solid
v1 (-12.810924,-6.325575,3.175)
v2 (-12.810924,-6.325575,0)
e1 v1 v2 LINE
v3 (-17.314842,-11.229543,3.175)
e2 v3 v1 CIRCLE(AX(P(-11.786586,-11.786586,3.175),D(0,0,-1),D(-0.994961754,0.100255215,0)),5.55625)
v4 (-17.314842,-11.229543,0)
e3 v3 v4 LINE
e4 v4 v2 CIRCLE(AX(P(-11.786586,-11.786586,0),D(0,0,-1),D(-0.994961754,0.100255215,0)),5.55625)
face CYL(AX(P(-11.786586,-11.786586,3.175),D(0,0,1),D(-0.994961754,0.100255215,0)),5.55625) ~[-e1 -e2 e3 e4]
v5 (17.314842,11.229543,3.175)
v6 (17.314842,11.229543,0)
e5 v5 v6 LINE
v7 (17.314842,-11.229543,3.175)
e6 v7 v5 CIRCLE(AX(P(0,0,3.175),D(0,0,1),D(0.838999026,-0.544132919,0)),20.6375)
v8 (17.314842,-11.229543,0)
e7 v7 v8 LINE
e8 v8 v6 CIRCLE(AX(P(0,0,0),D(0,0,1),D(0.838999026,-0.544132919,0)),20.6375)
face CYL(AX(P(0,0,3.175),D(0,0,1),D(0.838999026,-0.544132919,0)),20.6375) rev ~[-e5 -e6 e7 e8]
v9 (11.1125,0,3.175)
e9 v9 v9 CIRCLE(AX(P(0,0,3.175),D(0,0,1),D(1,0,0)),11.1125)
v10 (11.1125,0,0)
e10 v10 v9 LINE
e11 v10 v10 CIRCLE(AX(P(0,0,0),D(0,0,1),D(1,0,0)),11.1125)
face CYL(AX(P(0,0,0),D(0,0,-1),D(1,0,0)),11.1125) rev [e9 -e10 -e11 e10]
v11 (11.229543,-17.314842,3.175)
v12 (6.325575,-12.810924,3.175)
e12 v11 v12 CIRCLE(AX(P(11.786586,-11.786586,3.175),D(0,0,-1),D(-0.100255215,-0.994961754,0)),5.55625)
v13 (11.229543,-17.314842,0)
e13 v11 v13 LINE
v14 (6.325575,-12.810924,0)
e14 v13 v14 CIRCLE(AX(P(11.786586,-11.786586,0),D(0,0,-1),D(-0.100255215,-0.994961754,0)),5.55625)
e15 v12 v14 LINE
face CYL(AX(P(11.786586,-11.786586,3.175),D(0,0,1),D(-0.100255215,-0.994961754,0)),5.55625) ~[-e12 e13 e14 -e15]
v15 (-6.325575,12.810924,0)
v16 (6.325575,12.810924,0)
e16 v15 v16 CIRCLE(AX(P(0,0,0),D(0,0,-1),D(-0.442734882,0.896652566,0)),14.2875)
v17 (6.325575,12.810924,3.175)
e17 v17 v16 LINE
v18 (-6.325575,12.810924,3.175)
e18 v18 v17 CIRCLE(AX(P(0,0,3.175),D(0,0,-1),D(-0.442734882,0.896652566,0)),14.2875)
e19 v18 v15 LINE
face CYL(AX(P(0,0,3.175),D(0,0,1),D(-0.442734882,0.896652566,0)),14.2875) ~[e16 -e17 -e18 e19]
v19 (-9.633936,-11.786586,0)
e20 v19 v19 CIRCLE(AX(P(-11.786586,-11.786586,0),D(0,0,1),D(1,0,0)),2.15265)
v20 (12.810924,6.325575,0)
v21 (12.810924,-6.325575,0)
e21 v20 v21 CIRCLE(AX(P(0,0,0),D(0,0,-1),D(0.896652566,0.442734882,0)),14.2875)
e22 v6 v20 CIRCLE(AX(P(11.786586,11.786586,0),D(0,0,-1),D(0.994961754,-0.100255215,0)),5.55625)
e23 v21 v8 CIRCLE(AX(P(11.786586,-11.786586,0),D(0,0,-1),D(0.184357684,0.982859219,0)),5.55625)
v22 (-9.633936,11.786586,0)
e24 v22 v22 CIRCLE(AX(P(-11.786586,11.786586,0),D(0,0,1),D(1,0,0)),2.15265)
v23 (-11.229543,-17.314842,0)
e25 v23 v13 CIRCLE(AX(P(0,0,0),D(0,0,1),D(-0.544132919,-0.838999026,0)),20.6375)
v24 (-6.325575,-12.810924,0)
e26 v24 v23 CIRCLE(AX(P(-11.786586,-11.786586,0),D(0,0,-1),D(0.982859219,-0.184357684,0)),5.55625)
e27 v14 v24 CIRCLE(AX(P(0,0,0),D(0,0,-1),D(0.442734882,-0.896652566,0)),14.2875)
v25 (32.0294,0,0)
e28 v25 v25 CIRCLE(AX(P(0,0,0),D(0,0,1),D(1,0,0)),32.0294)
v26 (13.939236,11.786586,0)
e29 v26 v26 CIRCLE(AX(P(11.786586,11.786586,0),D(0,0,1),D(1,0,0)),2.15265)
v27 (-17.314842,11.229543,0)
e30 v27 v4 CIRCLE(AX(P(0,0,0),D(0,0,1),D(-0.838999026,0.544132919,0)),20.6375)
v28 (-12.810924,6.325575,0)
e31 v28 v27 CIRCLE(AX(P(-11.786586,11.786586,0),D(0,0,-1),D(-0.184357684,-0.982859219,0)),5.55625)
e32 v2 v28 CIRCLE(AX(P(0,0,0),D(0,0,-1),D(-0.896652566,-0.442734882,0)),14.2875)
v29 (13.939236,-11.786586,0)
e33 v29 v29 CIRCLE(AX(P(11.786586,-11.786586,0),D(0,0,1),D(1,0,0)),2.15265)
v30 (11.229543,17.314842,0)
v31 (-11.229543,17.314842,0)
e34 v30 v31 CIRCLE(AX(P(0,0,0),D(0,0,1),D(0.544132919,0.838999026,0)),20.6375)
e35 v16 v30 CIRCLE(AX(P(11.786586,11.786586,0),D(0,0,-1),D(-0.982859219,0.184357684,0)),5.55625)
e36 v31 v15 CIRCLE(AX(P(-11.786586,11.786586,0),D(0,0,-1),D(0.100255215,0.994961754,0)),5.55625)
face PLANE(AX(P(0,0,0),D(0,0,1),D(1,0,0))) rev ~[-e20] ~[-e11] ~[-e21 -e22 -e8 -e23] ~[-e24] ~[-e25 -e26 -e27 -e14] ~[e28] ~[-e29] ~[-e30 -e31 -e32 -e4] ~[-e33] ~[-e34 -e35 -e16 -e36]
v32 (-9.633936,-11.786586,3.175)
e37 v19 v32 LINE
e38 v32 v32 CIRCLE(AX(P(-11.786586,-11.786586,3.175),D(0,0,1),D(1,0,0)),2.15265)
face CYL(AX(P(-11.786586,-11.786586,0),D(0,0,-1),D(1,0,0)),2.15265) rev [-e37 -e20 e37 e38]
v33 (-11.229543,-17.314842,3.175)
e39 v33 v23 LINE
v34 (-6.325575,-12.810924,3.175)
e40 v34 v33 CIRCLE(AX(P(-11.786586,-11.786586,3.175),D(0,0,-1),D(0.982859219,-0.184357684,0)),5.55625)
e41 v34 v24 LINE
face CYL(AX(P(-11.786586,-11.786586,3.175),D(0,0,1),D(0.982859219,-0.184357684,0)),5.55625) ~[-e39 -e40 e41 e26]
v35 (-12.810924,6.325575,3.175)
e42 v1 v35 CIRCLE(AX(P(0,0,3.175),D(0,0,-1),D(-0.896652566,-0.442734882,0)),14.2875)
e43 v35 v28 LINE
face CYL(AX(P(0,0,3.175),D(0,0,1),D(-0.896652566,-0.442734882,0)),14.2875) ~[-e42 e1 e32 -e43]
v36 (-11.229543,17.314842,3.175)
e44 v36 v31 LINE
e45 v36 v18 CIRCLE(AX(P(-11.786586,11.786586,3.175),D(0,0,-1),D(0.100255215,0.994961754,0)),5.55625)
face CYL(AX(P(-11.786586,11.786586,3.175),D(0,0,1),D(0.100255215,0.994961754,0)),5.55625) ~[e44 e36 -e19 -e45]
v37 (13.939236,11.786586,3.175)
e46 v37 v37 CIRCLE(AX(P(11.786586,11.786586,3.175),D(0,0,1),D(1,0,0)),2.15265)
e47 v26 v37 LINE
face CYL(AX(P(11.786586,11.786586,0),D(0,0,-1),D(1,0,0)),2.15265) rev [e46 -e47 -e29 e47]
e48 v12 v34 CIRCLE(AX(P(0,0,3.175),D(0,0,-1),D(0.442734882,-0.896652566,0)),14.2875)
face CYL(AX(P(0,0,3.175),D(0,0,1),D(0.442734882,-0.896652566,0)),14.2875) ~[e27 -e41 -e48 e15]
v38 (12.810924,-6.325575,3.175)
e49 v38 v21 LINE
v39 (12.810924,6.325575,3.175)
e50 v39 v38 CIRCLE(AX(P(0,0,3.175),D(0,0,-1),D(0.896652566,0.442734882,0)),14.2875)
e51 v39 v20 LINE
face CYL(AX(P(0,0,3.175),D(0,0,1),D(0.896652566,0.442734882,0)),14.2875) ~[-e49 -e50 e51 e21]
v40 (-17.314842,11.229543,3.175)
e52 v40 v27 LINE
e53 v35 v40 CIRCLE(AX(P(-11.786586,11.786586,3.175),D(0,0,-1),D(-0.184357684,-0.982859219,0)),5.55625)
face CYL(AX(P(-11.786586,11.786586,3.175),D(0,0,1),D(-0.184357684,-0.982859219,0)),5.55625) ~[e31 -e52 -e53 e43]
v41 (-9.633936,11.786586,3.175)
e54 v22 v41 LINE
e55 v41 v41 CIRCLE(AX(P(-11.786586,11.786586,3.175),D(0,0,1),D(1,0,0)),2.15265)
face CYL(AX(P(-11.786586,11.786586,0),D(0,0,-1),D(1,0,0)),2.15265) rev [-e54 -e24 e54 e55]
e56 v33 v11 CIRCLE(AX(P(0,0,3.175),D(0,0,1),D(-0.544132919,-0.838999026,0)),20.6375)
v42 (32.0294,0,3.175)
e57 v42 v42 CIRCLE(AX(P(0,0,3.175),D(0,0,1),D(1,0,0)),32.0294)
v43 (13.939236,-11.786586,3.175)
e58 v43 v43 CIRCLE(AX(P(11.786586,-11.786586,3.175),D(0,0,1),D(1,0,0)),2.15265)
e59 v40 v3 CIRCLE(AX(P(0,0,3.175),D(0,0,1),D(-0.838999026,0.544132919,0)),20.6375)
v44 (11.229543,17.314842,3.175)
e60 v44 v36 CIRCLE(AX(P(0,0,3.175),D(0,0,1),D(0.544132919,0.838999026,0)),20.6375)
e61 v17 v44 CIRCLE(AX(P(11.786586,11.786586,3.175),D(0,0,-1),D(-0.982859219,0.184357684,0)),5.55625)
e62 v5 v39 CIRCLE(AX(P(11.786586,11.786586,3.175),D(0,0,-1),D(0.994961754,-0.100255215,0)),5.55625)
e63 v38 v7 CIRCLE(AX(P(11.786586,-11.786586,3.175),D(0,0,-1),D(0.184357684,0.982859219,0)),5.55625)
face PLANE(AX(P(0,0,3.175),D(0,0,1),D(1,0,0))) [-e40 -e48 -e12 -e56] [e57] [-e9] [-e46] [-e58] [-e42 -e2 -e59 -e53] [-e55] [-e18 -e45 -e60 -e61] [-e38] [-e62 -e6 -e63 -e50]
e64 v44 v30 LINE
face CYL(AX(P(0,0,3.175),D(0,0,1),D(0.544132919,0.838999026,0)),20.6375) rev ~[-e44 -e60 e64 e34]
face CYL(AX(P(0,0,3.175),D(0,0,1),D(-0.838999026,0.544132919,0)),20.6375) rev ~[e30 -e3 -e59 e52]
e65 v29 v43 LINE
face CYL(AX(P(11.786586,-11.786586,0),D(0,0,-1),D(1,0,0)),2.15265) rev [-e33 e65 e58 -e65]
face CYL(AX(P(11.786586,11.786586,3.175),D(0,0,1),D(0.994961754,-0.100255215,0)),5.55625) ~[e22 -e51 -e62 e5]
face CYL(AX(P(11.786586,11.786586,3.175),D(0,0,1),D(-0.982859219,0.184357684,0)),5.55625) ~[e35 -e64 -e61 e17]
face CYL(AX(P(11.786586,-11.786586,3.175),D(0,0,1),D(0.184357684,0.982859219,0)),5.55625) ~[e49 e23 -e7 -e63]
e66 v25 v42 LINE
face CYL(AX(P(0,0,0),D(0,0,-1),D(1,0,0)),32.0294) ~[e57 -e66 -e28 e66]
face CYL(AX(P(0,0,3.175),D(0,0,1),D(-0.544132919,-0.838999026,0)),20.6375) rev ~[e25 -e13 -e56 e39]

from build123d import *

# Parameters (mm, degrees)
F0_R            = 32.0294
F0_R_2          = 2.15265
F0_R_3          = 11.1125
F1_DEPTH        = 3.175
F3_DEPTH        = 3.175
F3_COPIES_COUNT = 4


# Not quite as in the source:
# - a pattern or mirror of a feature is missing from the dataset's text; its kind, count and spacing are read off the source's solid


with BuildPart() as f1:
    # F0 (on Top) → F1 (new body)
    with BuildSketch(Plane.XY):
        Circle(F0_R)
        with Locations((-11.7865861589, -11.7865861589)):
            Circle(F0_R_2, mode=Mode.SUBTRACT)
        with Locations((11.7865861589, -11.7865861589)):
            Circle(F0_R_2, mode=Mode.SUBTRACT)
        with Locations((-11.7865861589, 11.7865861589)):
            Circle(F0_R_2, mode=Mode.SUBTRACT)
        Circle(F0_R_3, mode=Mode.SUBTRACT)
        with Locations((11.7865861589, 11.7865861589)):
            Circle(F0_R_2, mode=Mode.SUBTRACT)
    extrude(amount=F1_DEPTH)

    # F2 (on face) → F3 (cut, through all)
    with BuildSketch(Plane.XY.offset(3.175)):
        with BuildLine():
            ThreePointArc((-11.229543123, 17.3148424047), (-8.0281867, 15.8788163052), (-6.3255746232, 12.8109235396))
            ThreePointArc((-6.3255746232, 12.8109235396), (0, 14.2875), (6.3255746232, 12.8109235396))
            ThreePointArc((6.3255746232, 12.8109235396), (8.0281867, 15.8788163052), (11.229543123, 17.3148424047))
            ThreePointArc((11.229543123, 17.3148424047), (0, 20.6375), (-11.229543123, 17.3148424047))
        make_face()
    f3 = extrude(amount=-F3_DEPTH, mode=Mode.SUBTRACT)

    # F3_copies: F3 ×4 about axis
    f3_copies_axis = Axis((0, 0, 0), (0, 0, 1))
    for i in range(1, F3_COPIES_COUNT):
        add(f3.rotate(f3_copies_axis, i * 360 / F3_COPIES_COUNT), mode=Mode.SUBTRACT)


solid = f1.part
